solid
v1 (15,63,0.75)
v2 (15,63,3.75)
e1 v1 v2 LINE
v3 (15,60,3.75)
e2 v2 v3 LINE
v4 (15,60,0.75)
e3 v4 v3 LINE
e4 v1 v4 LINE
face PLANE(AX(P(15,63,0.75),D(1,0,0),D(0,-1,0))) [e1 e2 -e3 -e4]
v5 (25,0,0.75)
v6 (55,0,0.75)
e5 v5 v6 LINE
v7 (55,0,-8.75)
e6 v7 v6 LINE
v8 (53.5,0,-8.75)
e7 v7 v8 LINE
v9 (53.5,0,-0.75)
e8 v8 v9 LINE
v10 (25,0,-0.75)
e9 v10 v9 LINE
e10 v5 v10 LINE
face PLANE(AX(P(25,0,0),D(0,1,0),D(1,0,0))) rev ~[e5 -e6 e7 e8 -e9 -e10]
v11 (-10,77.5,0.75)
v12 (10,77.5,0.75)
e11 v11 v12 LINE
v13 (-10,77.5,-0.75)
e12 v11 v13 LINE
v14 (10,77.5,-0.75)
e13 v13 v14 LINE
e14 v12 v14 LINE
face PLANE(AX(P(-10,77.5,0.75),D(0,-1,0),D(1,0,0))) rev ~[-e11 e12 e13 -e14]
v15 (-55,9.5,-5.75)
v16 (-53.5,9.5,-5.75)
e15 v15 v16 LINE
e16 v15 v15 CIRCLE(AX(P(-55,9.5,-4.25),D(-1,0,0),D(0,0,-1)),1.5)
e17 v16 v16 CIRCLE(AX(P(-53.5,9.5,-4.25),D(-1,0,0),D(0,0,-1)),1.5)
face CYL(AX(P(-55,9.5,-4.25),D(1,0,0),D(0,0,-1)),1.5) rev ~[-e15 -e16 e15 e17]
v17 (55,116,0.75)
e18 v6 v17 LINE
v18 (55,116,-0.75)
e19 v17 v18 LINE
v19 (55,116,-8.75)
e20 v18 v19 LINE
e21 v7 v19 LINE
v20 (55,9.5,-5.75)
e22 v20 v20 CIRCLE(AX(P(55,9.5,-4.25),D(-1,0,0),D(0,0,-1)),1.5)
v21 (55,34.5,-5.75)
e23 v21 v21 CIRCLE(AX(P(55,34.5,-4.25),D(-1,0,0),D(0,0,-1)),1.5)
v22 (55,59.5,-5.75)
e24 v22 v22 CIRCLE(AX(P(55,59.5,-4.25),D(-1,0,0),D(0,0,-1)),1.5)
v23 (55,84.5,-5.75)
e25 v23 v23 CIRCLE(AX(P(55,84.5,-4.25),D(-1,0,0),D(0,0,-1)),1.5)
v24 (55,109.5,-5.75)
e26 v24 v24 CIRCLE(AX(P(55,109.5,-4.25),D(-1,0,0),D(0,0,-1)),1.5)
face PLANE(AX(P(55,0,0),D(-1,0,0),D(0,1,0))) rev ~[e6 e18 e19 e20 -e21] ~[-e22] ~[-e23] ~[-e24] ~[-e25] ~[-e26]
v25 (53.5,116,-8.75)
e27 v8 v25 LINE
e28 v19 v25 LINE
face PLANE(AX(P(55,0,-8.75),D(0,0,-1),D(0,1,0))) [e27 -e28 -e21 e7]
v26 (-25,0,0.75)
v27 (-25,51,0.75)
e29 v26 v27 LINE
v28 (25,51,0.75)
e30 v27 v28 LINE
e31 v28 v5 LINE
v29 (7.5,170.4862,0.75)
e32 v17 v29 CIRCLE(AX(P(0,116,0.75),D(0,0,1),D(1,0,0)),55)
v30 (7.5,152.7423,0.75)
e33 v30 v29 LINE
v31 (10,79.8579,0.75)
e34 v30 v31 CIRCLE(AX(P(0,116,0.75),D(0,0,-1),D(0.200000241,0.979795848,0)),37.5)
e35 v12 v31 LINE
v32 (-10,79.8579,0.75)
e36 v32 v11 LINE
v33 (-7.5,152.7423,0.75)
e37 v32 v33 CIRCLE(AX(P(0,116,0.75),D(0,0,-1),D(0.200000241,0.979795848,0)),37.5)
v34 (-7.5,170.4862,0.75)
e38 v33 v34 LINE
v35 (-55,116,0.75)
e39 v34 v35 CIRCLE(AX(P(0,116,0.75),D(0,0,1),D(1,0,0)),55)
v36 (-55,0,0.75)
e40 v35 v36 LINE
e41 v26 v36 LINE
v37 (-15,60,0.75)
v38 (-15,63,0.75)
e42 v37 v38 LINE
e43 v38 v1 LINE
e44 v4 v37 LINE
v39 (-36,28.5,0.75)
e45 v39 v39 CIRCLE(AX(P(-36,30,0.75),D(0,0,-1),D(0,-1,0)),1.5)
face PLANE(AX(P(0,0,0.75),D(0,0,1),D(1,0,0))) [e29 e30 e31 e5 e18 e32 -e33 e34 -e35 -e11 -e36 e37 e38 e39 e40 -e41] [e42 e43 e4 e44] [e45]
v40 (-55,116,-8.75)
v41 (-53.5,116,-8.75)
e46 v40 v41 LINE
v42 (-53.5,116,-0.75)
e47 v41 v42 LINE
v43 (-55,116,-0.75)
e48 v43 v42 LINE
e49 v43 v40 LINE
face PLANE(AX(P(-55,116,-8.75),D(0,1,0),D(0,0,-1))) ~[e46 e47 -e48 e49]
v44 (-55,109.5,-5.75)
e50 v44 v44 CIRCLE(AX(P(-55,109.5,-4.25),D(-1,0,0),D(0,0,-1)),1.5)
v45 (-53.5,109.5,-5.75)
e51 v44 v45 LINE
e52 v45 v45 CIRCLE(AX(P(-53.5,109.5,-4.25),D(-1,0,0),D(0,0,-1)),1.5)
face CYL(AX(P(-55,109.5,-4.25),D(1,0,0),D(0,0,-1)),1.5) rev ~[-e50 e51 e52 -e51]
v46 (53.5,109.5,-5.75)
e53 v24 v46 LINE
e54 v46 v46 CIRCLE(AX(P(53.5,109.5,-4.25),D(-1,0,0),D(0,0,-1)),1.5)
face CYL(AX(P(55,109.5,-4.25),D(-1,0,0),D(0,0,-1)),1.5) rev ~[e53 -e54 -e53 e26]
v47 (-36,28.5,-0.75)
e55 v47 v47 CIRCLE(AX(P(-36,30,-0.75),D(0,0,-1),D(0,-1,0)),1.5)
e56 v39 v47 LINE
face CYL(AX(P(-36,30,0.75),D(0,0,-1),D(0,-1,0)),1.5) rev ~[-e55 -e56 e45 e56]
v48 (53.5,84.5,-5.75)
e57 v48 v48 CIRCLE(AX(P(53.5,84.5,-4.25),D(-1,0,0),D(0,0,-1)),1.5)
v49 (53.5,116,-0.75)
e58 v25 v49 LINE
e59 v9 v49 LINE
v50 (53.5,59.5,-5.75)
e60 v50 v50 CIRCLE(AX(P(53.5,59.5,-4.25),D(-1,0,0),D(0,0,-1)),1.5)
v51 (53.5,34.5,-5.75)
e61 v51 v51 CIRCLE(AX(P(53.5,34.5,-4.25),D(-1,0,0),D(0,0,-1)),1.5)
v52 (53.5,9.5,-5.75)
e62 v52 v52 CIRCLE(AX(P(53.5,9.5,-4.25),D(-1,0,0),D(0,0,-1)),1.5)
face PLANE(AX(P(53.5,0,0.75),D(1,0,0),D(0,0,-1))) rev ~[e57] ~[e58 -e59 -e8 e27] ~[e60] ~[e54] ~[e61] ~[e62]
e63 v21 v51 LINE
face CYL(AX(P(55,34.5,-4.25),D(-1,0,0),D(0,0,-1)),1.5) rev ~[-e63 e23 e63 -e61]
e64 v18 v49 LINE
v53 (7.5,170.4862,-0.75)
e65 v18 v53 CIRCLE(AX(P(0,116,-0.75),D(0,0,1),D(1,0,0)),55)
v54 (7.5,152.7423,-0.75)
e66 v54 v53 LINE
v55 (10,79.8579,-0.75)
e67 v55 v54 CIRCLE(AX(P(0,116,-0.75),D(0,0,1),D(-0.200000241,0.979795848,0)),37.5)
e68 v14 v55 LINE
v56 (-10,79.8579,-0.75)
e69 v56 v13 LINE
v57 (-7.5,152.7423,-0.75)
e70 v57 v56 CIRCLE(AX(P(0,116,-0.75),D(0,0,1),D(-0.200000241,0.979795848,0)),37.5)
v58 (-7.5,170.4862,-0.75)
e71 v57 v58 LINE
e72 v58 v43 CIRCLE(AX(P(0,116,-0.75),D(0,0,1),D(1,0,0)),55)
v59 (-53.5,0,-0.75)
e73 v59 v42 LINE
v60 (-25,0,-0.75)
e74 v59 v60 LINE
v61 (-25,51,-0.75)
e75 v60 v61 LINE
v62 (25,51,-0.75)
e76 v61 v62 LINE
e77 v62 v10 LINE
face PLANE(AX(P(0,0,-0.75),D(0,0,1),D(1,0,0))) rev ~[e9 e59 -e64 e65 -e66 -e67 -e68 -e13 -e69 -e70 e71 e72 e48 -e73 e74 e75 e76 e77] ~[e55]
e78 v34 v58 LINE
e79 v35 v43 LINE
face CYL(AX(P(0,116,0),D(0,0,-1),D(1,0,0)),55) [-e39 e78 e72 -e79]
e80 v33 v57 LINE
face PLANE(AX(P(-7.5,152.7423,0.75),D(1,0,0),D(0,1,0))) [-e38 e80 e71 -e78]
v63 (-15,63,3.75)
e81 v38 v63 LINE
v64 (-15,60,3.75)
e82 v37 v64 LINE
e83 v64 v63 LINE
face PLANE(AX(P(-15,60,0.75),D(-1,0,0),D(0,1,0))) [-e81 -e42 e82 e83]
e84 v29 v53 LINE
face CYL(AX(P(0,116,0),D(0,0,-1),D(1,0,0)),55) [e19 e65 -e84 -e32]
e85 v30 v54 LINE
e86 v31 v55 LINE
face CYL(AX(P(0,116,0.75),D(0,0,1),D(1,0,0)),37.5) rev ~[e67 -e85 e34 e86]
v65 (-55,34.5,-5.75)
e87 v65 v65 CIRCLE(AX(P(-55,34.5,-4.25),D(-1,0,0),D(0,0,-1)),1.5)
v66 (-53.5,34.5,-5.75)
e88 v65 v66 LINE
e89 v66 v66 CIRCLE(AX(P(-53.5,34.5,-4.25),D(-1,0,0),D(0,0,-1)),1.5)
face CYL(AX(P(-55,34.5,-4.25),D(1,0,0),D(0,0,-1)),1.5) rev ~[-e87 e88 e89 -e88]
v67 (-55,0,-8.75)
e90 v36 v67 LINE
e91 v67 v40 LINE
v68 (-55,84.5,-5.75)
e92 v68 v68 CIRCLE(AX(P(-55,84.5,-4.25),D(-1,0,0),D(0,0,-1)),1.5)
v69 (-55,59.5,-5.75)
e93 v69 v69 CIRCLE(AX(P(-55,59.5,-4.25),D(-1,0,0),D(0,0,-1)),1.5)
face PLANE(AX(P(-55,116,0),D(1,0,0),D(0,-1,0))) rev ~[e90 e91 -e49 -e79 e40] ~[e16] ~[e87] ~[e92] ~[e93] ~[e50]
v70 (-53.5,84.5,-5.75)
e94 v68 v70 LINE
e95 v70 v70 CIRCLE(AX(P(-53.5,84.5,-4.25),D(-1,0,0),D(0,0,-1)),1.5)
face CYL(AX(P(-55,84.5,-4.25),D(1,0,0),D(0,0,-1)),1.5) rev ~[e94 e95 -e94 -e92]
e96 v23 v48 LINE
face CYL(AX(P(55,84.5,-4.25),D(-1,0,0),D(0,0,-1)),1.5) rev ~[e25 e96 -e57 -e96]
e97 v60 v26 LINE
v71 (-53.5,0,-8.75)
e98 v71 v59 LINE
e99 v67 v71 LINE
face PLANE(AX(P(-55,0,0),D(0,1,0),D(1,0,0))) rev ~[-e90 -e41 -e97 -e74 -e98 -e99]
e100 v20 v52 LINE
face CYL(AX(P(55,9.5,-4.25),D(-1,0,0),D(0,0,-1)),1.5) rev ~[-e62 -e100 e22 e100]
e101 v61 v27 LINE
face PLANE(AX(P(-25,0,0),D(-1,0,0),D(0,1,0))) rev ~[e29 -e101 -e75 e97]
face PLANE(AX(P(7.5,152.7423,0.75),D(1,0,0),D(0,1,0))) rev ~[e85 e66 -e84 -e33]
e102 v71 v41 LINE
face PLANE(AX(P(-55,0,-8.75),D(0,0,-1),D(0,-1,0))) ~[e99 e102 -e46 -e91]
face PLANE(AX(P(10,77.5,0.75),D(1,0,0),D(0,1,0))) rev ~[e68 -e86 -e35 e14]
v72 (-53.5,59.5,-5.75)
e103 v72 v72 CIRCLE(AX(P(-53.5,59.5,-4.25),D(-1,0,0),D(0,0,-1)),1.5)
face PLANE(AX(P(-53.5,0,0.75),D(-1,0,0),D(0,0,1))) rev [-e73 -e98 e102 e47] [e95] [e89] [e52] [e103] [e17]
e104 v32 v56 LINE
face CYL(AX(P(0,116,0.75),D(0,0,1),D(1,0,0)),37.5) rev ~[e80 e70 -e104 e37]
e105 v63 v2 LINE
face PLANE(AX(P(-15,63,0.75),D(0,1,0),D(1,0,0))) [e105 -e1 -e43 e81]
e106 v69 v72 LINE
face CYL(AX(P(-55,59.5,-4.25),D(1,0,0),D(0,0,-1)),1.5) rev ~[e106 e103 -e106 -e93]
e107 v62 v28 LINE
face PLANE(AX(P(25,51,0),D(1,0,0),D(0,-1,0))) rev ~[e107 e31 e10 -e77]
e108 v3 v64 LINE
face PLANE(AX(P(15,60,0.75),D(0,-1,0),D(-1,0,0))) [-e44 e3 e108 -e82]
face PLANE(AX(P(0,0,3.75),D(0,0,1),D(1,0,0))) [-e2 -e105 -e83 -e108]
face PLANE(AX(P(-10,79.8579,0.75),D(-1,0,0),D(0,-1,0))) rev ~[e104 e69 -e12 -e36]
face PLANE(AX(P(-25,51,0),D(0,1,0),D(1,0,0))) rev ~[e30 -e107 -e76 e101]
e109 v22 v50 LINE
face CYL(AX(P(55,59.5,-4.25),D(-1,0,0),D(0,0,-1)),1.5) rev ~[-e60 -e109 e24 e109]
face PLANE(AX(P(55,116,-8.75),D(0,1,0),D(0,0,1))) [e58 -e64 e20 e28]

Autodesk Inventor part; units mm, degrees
ref_plane "YZ Plane" through (0, 0, 0) normal (1, 0, 0) x (0, 1, 0)
ref_plane "XZ Plane" through (0, 0, 0) normal (0, 1, 0) x (-1, 0, 0)
ref_plane "XY Plane" through (0, 0, 0) normal (0, 0, 1) x (1, 0, 0)
sketch "Skizze1" plane through (0, 0, 0) normal (0, 0, 1) x (1, 0, 0)
  line L0 (-25, 0) -> (-25, 51)
  line L1 (-25, 51) -> (25, 51)
  line L2 (25, 51) -> (25, 0)
  line L3 (25, 0) -> (55, 0)
  line L4 (55, 0) -> (55, 116)
  arc A0 (55, 116) -> (-55, 116) centre (0, 116) ccw
  line L5 (-55, 116) -> (-55, 0)
  line L6 (-55, 0) -> (-25, 0)
  point P0 (0, 0)
  point P1 (0, 51)
  point P2 (-40, 0)
  dimension "d0" = 25
  dimension "d1" = 51
  dimension "d2" = 116
  dimension "d3" = 55
extrude "Extrusion1" add sketch "Skizze1" along normal mid plane 1.5
sketch "Skizze2" plane through (0, 0, 0.75) normal (0, 0, 1) x (1, 0, 0)
  line L0 (-25, 51) -> (25, 51) projected
  line L1 (25, 51) -> (25, 0) projected
  line L2 (25, 0) -> (55, 0) projected
  line L3 (55, 0) -> (55, 116) projected
  arc A0 (55, 116) -> (-55, 116) centre (0, 116) ccw projected
  line L4 (-55, 116) -> (-55, 0) projected
  line L5 (-55, 0) -> (-25, 0) projected
  line L6 (-25, 0) -> (-25, 51) projected
  circle A1 centre (0, 116) radius 37.5
  point P0 (0, 0)
  dimension "d6" = 75
extrude "Extrusion2" cut sketch "Skizze2" against normal up to surface (1.5 mm away) contours A1
sketch "Skizze3" plane through (0, 0, 0.75) normal (0, 0, 1) x (1, 0, 0)
  arc A0 (55, 116) -> (-55, 116) centre (0, 116) ccw projected
  circle A1 centre (0, 116) radius 37.5 projected
  line L0 (-7.5, 152.7423) -> (-7.5, 170.4862)
  line L1 (7.5, 152.7423) -> (7.5, 170.4862)
  line L2 (0, 116) -> (0, 135.7591) construction
  line L3 (-10, 79.8579) -> (-10, 77.5)
  line L4 (-10, 77.5) -> (10, 77.5)
  line L5 (10, 77.5) -> (10, 79.8579)
  point P0 (0, 0)
  dimension "d9" = 15
  dimension "d12" = 20
  dimension "d13" = 1
extrude "Extrusion3" cut sketch "Skizze3" against normal up to surface (1.5 mm away) contours L1 A1 L0 A0
extrude "Extrusion4" cut sketch "Skizze3" against normal up to surface (1.5 mm away) contours A1 L5 L4 L3
sketch "Skizze5" plane through (0, 0, 0.75) normal (0, 0, 1) x (1, 0, 0)
  line L0 (-15, 63) -> (15, 63)
  line L1 (15, 63) -> (15, 60)
  line L2 (15, 60) -> (-15, 60)
  line L3 (-15, 60) -> (-15, 63)
  point P0 (0, 0)
  point P1 (0, 60)
  dimension "d16" = 3
  dimension "d17" = 30
  dimension "d18" = 60
extrude "Extrusion5" add sketch "Skizze5" along normal blind 3
sketch "Sketch9" plane through (55, 0, 0.75) normal (1, 0, 0) x (0, 0, -1)
  line L0 (1.5, 116) -> (1.5, 0) projected
  line L1 (0, 0) -> (0, 116) projected
  line L2 (1.5, 116) -> (0, 116) projected
  line L3 (1.5, 0) -> (0, 0) projected
  line L4 (9.5, 0) -> (9.5, 116)
  line L5 (1.5, 116) -> (1.5, 0)
  line L6 (9.5, 116) -> (0, 116)
  line L7 (0, 0) -> (9.5, 0)
  point P0 (0.75, 0)
  dimension "d39" = 8
extrude "Extrusion7" add sketch "Sketch9" against normal blind 1.5
sketch "Sketch8" plane through (55, 0, 0.75) normal (1, 0, 0) x (0, 0, -1)
  line L0 (0, 0) -> (0, 116) projected
  point P0 (0.75, 0)
  point P1 (5, 109.5)
  point P2 (5, 84.5)
  point P3 (5, 59.5)
  point P4 (5, 34.5)
  point P5 (5, 9.5)
  dimension "d26" = 25
  dimension "d27" = 25
  dimension "d28" = 25
  dimension "d29" = 25
  dimension "d30" = 5
hole "Hole1" at (55, 109.5, -4.25) at (55, 84.5, -4.25) at (55, 59.5, -4.25) at (55, 34.5, -4.25) at (55, 9.5, -4.25) direction (-1, 0, 0) diameter 3 depth 1.5
mirror "Mirror1" about plane through (0, 0, 0) normal (1, 0, 0) of "Hole1", "Extrusion7"
sketch "Sketch10" plane through (0, 0, 0.75) normal (0, 0, 1) x (1, 0, 0)
  line L0 (-55, 0) -> (-25, 0) projected
  line L1 (-55, 116) -> (-55, 0) projected
  point P0 (0, 0)
  point P1 (-36, 30)
  dimension "d42" = 30
  dimension "d43" = 19
hole "Hole2" at (-36, 30, 0.75) direction (0, 0, -1) diameter 3 depth 1.5
equation "\"d27\" = d26"
equation "\"d28\" = d26"
equation "\"d29\" = d26"
properties part number "1 part 06"
